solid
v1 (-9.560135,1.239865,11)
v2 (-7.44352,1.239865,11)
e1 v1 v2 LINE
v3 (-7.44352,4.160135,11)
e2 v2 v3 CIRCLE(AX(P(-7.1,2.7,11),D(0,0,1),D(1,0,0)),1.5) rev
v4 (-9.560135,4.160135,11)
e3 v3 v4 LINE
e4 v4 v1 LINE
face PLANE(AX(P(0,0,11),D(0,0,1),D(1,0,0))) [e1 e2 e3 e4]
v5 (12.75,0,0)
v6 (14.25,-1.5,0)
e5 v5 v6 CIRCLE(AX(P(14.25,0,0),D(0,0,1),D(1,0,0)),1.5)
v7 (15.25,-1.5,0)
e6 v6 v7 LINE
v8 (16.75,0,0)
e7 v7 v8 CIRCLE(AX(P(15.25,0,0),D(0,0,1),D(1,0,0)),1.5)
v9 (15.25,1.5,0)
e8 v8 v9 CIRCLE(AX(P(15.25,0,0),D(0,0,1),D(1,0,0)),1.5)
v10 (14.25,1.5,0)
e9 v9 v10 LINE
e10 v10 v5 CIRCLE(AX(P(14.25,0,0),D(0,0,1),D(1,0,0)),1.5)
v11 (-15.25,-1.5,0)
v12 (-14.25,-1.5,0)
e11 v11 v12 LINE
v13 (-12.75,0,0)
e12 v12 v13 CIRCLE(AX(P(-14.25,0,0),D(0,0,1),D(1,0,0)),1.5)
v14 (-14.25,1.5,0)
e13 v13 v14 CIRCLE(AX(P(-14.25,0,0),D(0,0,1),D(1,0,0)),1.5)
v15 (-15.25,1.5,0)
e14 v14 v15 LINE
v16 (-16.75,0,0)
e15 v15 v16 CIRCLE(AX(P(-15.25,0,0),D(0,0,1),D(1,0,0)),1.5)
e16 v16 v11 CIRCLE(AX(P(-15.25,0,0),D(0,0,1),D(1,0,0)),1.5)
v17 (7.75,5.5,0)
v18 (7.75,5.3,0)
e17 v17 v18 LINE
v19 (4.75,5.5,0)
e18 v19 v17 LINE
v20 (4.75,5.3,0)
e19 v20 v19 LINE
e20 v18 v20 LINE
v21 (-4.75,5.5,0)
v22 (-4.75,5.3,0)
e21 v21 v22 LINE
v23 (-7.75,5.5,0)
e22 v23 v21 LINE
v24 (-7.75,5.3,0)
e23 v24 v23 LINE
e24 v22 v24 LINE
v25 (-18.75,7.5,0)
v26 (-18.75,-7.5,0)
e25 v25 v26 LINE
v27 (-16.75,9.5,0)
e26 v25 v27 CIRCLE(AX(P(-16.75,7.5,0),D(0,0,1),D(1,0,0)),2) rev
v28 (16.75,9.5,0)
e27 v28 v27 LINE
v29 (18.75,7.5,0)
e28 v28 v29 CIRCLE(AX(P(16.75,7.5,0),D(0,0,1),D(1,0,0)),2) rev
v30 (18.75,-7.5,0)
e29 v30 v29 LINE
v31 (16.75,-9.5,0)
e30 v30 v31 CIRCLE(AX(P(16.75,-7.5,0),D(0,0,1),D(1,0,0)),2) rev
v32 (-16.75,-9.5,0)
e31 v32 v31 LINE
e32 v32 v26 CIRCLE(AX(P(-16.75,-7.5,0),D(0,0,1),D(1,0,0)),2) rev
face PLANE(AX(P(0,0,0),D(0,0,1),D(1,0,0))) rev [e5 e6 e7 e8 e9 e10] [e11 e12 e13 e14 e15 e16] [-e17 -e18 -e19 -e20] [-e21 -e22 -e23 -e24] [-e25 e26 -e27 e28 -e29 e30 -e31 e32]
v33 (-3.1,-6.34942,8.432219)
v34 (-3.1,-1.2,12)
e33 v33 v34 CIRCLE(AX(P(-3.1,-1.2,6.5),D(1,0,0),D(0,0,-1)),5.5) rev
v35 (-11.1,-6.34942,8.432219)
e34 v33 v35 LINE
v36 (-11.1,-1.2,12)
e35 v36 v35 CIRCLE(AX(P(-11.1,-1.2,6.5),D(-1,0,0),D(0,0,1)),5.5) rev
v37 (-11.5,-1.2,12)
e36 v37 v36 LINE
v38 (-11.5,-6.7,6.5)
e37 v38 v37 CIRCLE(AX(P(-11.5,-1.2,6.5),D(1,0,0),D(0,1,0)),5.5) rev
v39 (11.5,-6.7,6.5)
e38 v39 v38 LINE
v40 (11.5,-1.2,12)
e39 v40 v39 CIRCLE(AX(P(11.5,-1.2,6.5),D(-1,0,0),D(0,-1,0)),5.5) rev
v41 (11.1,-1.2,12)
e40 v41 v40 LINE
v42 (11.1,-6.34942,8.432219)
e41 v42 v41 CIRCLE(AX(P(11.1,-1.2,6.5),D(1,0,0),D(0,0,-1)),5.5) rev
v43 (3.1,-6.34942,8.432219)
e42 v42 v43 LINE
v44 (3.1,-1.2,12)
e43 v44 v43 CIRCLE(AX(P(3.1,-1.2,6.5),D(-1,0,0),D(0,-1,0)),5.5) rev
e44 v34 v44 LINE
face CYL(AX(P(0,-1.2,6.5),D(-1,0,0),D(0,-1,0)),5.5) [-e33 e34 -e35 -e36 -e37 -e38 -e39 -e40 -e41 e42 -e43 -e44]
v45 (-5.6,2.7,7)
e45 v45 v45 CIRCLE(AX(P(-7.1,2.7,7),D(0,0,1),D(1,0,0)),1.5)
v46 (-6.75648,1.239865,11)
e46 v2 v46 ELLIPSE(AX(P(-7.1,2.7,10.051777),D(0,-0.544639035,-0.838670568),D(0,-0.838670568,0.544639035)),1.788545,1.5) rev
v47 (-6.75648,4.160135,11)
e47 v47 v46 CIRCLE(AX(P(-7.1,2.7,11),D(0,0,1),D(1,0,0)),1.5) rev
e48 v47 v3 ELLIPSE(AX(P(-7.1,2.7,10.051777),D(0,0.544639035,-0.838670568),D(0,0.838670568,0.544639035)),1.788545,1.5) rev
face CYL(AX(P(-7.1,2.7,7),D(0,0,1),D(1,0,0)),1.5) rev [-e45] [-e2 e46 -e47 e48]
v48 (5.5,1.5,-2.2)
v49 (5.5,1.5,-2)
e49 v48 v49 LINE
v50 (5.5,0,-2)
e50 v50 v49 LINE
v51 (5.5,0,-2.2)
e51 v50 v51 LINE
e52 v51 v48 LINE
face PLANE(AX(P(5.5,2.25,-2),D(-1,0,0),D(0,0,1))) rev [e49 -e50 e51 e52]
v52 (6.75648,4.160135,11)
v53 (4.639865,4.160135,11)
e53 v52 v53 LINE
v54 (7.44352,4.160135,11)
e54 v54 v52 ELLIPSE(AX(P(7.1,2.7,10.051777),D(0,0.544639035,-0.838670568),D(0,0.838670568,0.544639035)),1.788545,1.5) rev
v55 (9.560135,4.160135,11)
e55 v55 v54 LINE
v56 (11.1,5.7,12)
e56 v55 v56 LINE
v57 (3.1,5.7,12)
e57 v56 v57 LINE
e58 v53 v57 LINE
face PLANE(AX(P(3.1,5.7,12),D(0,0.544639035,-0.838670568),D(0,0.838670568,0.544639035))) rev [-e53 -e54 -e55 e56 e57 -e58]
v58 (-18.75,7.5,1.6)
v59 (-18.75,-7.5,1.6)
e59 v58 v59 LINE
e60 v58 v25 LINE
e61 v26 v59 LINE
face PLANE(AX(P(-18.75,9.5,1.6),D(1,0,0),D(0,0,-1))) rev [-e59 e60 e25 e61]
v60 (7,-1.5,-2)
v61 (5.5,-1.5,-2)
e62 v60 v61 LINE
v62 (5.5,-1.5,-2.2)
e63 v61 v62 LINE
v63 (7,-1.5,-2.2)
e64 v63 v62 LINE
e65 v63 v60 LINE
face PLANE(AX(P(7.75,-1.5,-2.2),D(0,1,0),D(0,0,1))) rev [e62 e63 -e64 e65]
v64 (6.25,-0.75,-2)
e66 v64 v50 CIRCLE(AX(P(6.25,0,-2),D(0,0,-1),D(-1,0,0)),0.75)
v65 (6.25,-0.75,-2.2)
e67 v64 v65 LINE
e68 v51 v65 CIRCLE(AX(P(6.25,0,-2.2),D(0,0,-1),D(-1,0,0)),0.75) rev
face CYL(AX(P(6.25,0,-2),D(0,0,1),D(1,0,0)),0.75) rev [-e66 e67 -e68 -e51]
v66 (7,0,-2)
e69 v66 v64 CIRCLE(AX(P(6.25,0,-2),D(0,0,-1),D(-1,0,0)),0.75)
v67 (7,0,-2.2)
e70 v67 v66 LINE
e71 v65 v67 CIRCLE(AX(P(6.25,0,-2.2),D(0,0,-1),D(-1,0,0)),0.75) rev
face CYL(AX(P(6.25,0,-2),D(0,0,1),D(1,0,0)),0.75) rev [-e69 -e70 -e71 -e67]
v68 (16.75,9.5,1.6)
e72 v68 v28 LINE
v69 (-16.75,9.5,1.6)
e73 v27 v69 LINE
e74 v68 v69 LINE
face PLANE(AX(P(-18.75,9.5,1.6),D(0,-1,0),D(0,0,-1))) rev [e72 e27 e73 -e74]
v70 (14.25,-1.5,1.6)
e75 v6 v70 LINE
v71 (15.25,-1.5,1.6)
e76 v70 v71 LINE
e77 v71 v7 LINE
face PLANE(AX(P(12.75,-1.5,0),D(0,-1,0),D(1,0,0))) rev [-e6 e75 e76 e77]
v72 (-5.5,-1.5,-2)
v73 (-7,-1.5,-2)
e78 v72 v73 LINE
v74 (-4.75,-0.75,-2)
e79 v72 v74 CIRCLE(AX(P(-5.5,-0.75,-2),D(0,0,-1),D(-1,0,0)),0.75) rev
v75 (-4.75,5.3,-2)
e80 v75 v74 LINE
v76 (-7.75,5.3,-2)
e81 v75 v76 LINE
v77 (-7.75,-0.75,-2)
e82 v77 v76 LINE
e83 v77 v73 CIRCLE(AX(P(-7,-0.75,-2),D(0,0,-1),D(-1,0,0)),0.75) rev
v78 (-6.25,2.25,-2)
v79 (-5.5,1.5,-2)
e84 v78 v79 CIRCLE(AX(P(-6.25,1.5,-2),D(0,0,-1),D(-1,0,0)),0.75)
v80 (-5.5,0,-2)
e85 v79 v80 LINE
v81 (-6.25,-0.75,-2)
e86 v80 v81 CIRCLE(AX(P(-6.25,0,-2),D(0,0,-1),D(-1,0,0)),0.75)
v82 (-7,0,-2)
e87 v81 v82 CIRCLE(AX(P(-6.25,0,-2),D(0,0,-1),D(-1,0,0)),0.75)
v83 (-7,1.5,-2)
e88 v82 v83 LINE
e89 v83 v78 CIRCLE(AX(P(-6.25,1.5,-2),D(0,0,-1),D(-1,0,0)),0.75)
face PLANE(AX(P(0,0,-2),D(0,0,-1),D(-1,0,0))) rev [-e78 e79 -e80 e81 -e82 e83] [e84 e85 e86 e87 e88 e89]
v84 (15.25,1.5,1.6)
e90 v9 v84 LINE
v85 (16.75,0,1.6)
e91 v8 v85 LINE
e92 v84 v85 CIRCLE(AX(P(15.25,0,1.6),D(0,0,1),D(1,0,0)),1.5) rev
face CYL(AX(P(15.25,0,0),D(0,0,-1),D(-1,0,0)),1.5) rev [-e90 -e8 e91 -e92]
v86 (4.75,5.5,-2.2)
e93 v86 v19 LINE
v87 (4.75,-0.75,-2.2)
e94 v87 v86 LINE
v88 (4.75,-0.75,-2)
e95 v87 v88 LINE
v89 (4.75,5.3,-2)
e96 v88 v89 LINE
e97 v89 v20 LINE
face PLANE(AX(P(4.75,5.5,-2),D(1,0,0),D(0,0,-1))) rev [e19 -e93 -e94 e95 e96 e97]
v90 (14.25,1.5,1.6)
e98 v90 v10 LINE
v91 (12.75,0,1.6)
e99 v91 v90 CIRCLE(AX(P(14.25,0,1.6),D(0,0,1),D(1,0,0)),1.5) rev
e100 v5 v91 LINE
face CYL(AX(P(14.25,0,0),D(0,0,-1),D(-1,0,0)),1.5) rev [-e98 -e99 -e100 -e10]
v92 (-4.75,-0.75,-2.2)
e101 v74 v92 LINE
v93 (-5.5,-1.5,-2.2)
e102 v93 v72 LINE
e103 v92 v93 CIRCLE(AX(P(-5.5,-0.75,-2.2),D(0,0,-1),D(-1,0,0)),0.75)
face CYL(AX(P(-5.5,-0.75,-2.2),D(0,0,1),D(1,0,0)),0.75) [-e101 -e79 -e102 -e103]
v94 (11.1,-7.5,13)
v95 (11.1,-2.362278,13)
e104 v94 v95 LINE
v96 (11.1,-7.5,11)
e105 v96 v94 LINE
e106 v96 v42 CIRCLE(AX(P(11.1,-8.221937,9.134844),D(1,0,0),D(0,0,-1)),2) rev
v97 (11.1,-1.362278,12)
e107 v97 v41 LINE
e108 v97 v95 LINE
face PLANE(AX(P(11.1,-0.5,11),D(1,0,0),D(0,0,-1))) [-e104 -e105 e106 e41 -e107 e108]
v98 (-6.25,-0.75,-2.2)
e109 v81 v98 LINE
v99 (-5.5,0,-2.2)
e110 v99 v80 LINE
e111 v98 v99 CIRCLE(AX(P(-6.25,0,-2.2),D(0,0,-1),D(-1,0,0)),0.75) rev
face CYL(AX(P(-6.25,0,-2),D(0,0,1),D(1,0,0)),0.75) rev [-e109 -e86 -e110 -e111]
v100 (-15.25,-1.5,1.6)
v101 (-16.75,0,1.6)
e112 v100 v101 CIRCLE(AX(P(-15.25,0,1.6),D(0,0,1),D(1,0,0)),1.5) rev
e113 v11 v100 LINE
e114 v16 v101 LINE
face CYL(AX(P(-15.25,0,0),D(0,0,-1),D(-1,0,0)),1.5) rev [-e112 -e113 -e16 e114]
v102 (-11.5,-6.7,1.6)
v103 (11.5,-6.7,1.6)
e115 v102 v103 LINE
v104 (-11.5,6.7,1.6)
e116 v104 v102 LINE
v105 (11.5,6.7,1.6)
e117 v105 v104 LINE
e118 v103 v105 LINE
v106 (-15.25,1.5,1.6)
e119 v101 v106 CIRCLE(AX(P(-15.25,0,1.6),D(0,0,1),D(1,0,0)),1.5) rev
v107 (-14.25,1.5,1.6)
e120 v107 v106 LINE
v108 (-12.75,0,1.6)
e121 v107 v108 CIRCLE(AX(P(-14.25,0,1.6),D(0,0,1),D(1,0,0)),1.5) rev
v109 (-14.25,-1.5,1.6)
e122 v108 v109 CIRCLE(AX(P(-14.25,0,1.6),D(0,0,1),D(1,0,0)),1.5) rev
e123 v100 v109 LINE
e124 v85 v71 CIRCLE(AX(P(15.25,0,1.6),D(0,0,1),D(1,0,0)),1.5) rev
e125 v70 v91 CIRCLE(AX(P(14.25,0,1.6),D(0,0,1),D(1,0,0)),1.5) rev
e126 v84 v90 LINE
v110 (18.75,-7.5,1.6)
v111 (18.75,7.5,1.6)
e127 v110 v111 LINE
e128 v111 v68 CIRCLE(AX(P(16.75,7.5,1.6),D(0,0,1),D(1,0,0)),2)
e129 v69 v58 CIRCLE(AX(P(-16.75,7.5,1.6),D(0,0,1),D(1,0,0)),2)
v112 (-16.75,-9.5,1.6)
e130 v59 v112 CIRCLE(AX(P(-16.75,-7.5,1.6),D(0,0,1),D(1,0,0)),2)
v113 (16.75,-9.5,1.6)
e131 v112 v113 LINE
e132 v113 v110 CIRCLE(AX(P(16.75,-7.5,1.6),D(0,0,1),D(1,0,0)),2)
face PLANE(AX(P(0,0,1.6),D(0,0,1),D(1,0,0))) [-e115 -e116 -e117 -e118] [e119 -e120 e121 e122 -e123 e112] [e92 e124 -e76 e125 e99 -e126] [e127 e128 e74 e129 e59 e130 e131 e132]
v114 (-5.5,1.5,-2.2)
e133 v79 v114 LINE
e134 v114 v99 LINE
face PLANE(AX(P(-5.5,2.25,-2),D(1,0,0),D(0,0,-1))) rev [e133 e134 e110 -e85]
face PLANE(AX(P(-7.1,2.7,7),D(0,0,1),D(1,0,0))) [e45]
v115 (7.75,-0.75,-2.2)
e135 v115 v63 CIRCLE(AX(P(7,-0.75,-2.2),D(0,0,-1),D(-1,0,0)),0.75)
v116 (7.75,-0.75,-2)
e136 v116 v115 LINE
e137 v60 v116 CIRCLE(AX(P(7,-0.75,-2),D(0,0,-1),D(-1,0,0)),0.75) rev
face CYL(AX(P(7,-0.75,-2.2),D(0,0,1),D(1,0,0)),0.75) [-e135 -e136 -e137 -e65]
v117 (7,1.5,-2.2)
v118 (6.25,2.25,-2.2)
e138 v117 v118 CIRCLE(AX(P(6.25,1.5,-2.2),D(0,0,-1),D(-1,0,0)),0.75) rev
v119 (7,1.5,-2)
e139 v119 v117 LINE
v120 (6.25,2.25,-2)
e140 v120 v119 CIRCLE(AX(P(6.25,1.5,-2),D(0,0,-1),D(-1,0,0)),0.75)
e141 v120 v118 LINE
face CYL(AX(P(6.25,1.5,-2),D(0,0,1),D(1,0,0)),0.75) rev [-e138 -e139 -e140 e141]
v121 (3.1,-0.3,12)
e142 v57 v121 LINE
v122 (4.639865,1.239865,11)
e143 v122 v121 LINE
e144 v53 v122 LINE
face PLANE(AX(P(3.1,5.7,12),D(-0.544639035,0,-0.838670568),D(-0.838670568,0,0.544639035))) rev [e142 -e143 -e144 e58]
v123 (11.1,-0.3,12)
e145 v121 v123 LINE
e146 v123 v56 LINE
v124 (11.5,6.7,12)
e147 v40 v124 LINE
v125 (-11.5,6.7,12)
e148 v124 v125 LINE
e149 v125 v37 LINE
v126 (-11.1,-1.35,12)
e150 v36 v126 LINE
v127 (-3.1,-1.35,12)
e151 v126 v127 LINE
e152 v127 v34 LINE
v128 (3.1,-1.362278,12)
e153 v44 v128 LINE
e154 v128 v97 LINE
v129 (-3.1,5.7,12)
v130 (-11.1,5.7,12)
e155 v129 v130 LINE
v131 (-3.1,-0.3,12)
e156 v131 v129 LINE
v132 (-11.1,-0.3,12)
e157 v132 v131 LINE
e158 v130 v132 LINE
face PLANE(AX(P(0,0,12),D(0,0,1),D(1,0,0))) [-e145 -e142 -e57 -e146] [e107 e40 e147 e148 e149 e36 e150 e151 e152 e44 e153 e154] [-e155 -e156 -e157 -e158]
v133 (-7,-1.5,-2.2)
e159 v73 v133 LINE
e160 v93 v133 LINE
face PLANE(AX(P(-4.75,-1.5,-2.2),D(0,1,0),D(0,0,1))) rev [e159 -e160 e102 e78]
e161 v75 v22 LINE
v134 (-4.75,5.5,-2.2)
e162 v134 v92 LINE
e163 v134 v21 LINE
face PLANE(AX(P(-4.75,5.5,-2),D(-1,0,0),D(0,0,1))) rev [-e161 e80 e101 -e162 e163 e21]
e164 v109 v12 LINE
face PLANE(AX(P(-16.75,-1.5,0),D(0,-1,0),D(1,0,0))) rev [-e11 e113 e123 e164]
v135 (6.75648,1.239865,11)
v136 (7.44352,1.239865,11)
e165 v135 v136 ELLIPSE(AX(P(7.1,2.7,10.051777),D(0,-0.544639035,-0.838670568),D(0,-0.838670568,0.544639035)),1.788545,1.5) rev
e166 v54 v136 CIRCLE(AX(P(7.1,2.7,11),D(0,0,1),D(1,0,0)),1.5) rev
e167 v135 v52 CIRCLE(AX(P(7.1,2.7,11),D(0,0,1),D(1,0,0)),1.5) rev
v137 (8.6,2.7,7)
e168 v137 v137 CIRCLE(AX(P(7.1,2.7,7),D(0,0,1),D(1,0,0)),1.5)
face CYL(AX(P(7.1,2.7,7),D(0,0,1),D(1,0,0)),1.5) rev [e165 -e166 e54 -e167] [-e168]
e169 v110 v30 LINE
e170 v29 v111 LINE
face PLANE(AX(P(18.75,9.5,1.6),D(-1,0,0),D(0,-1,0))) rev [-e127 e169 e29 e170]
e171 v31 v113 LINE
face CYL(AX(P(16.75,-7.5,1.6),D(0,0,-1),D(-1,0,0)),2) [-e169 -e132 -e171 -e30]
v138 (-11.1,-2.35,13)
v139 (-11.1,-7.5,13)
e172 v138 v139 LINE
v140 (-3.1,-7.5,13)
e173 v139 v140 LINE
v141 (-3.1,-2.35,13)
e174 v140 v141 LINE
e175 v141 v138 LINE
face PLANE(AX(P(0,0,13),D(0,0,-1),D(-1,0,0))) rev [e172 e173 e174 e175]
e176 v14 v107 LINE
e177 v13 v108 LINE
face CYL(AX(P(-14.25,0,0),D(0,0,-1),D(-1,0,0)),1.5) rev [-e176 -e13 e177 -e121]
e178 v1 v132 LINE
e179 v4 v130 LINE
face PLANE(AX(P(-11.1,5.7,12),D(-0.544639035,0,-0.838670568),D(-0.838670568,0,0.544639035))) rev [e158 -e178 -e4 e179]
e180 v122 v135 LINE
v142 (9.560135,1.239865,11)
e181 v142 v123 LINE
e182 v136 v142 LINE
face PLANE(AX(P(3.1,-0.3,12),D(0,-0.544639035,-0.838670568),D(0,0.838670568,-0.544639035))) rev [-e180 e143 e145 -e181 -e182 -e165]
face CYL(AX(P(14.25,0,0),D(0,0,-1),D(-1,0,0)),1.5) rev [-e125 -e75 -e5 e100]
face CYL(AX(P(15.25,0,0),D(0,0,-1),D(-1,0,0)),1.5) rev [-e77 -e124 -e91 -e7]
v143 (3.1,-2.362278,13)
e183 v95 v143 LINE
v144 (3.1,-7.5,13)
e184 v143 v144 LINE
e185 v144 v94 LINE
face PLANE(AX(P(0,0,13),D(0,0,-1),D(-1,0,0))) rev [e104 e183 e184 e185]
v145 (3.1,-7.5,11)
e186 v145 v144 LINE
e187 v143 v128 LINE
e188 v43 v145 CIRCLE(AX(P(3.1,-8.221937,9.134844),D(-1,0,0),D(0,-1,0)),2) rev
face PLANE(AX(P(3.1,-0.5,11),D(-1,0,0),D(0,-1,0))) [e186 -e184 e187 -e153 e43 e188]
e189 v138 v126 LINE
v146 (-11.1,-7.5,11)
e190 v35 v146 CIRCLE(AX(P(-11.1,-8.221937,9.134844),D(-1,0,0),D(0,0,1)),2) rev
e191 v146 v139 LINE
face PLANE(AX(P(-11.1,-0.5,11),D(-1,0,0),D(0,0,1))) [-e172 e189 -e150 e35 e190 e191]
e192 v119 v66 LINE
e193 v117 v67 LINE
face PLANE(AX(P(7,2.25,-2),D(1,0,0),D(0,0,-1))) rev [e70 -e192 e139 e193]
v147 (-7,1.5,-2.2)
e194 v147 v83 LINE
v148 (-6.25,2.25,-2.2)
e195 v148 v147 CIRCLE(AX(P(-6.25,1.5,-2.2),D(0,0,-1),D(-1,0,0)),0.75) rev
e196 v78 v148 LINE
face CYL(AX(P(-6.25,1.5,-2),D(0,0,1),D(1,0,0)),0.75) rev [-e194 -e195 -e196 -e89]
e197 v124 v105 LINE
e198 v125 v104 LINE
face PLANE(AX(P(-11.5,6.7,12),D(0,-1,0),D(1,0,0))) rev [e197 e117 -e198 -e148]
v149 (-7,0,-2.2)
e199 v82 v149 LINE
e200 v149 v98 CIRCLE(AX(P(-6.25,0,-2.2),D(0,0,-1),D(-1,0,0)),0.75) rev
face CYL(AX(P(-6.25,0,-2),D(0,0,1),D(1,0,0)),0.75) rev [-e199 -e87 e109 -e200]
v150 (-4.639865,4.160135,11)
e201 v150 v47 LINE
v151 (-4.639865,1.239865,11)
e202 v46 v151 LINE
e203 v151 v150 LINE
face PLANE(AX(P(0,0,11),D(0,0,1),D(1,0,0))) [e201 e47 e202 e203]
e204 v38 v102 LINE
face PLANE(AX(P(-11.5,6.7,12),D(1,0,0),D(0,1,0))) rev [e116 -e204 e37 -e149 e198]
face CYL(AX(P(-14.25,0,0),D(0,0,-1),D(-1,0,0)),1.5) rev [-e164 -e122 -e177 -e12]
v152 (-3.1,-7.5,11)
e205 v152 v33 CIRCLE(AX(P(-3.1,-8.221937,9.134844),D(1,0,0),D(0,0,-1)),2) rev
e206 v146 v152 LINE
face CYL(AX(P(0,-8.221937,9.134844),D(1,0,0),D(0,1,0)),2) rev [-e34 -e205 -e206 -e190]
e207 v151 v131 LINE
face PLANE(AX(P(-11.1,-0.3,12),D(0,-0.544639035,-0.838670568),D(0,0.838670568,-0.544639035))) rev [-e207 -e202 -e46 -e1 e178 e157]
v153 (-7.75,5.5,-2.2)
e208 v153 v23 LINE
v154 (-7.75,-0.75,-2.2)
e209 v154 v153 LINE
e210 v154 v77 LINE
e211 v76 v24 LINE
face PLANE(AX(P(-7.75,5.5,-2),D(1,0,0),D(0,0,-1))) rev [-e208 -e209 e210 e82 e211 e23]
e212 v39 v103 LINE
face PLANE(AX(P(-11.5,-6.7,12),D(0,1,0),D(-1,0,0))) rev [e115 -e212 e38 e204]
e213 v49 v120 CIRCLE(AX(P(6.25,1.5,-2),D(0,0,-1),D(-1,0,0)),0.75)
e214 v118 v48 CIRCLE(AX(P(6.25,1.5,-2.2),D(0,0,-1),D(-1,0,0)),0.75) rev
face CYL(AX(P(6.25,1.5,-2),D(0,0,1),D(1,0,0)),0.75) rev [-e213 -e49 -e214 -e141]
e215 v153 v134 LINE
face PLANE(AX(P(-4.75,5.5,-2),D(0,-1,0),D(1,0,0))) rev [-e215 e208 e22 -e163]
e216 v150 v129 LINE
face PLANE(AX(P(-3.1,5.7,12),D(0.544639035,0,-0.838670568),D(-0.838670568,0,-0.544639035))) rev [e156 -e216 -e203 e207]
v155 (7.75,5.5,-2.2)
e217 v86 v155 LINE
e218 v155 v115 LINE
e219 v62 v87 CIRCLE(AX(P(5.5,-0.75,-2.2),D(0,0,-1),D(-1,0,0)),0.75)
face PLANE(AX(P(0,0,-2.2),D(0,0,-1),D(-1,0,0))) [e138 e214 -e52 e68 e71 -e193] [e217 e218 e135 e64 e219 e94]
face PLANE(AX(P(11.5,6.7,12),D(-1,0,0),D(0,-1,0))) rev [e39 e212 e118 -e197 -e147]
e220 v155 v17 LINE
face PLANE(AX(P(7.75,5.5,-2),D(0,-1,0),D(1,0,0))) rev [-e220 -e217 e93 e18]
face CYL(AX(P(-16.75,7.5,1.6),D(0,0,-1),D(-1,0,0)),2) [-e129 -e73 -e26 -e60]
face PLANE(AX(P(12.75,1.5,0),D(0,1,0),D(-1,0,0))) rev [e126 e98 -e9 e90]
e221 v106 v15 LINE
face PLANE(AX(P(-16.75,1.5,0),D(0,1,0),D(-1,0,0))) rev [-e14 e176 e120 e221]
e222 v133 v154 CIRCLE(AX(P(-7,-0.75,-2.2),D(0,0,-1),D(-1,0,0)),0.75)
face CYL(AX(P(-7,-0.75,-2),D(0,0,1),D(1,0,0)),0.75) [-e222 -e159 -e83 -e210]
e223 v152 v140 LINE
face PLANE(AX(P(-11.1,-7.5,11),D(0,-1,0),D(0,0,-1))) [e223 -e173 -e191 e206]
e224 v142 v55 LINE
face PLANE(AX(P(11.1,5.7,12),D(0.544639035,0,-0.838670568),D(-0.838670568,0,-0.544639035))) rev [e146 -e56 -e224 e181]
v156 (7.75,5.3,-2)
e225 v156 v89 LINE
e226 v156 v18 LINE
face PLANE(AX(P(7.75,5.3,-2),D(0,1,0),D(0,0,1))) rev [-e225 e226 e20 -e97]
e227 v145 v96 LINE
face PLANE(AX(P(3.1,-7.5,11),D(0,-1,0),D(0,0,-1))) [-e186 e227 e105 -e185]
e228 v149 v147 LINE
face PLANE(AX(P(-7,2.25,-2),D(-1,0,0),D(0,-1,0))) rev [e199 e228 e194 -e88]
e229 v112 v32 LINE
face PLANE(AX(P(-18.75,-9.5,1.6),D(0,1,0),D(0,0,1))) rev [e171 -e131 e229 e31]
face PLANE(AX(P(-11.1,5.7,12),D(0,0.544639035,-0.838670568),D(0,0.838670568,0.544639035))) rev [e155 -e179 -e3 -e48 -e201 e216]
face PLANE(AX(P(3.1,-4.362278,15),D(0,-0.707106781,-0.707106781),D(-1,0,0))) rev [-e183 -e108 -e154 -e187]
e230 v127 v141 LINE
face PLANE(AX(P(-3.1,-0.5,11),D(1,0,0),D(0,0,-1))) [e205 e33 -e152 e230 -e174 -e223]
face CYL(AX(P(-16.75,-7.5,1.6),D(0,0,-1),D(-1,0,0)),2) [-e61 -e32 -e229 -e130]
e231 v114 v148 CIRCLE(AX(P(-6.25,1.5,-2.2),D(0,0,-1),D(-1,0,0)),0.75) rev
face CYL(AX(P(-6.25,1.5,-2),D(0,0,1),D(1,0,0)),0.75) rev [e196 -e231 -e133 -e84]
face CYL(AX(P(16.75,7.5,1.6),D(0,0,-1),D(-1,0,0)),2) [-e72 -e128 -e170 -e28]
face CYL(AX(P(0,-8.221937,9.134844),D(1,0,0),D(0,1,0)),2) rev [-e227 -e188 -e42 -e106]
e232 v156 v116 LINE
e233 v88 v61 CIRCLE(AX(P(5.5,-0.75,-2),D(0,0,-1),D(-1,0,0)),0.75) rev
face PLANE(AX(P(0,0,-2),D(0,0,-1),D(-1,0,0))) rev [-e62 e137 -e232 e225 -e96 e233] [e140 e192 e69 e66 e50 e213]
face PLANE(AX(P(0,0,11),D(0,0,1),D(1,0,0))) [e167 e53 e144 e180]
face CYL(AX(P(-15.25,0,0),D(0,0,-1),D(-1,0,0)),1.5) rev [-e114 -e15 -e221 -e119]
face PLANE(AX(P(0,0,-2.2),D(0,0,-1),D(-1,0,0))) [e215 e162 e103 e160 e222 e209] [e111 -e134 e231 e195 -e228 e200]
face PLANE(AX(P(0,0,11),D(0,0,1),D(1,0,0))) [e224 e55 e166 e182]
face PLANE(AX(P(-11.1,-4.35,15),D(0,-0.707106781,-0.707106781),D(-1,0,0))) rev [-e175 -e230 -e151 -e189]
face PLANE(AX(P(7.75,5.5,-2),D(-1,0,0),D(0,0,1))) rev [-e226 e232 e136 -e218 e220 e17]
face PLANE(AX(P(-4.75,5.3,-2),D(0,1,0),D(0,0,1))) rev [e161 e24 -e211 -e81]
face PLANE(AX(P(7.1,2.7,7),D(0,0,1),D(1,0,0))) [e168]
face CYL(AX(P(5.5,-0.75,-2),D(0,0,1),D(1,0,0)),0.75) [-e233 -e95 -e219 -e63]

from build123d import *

# Parameters (mm, degrees)
SKETCH_2_W                    = 37.5
SKETCH_2_H                    = 19
EXTRUDE_1_DEPTH               = 1.6
SKETCH_3_W                    = 23
SKETCH_3_H                    = 13.4
EXTRUDE_2_DEPTH               = 10.4
FILLET_1_R                    = 2
SKETCH_4_W                    = 4
SKETCH_4_H                    = 3
CUT_EXTRUDE_1_DEPTH           = 1.6
FILLET_2_R                    = 1.5
SKETCH_5_R                    = 1.5
CUT_EXTRUDE_2_DEPTH           = 5
SKETCH_6_W                    = 8
SKETCH_6_H                    = 6
CUT_EXTRUDE_3_DEPTH           = 1
CUT_EXTRUDE_3_DRAFT           = -57
CUT_EXTRUDE_3_PROFILE_2_DEPTH = 1
CUT_EXTRUDE_3_PROFILE_2_DRAFT = -57
FILLET_3_R                    = 5.5
SKETCH_7_W                    = 8
SKETCH_7_H                    = 7
EXTRUDE_3_DEPTH               = 1
SKETCH_8_W                    = 8
SKETCH_8_H                    = 3.15
SKETCH_8_H_2                  = 3.13772234
EXTRUDE_4_DEPTH               = 1
FILLET_4_R                    = 2
SKETCH_9_W                    = 3
SKETCH_9_H                    = 0.2
EXTRUDE_5_DEPTH               = 2
SKETCH_10_W                   = 3
SKETCH_10_H                   = 7
EXTRUDE_6_DEPTH               = 0.2
SKETCH_11_W                   = 1.5
SKETCH_11_H                   = 3
CUT_EXTRUDE_4_DEPTH           = 0.2
FILLET_5_R                    = 0.75


# Some blends are built 0.0001 mm under size
with BuildPart() as part:
    # Эскиз2 → Бобышка-Вытянуть1 (new body)
    with BuildSketch(Plane.XY):
        Rectangle(SKETCH_2_W, SKETCH_2_H)
    extrude(amount=EXTRUDE_1_DEPTH)

    # Эскиз3 → Бобышка-Вытянуть2 (add)
    with BuildSketch(Plane.XY.offset(1.6)):
        Rectangle(SKETCH_3_W, SKETCH_3_H)
    extrude(amount=EXTRUDE_2_DEPTH)

    # Скругление1
    fillet_1_edges = [part.edges().sort_by_distance(p)[0] for p in [
        (-18.75, 9.5, 0.8),
        (18.75, 9.5, 0.8),
        (18.75, -9.5, 0.8),
        (-18.75, -9.5, 0.8),
    ]]
    fillet(fillet_1_edges, radius=FILLET_1_R)

    # Эскиз4 → Вырез-Вытянуть1 (cut)
    with BuildSketch(Plane.XY.offset(1.6)):
        with Locations((14.75, 0)):
            Rectangle(SKETCH_4_W, SKETCH_4_H)
        with Locations((-14.75, 0)):
            Rectangle(SKETCH_4_W, SKETCH_4_H)
    extrude(amount=-CUT_EXTRUDE_1_DEPTH, mode=Mode.SUBTRACT)

    # Скругление2
    fillet_2_edges = [part.edges().sort_by_distance(p)[0] for p in [
        (-16.75, 1.5, 0.8),
        (-12.75, 1.5, 0.8),
        (16.75, 1.5, 0.8),
        (16.75, -1.5, 0.8),
        (-12.75, -1.5, 0.8),
        (-16.75, -1.5, 0.8),
        (12.75, -1.5, 0.8),
        (12.75, 1.5, 0.8),
    ]]
    fillet(fillet_2_edges, radius=FILLET_2_R - 0.0001)  # a hair under: the kernel refuses the full size

    # Эскиз5 → Вырез-Вытянуть2 (cut)
    with BuildSketch(Plane.XY.offset(12)):
        with Locations((-7.1, 2.7)):
            Circle(SKETCH_5_R)
        with Locations((7.1, 2.7)):
            Circle(SKETCH_5_R)
    extrude(amount=-CUT_EXTRUDE_2_DEPTH, mode=Mode.SUBTRACT)


with BuildPart() as cut_extrude_3_tool:
    # Эскиз6 → Вырез-Вытянуть3 (with draft: the straight prism first)
    with BuildSketch(Plane.XY.offset(12)):
        with Locations((-7.1, 2.7)):
            Rectangle(SKETCH_6_W, SKETCH_6_H)
    extrude(amount=-CUT_EXTRUDE_3_DEPTH)
    # Вырез-Вытянуть3: the draft: its side faces are tilted about the plane it starts from
    cut_extrude_3_sides = [cut_extrude_3_tool.faces().sort_by_distance(p)[0] for p in [
        (-11.1, 2.7, 11.5),
        (-7.1, -0.3, 11.5),
        (-3.1, 2.7, 11.5),
        (-7.1, 5.7, 11.5),
    ]]
    draft(cut_extrude_3_sides, Plane.XY.offset(12), CUT_EXTRUDE_3_DRAFT)


with BuildPart() as part_1:
    add(part.part)

    # Вырез-Вытянуть3: cut by cut_extrude_3_tool
    add(cut_extrude_3_tool.part, mode=Mode.SUBTRACT)


with BuildPart() as cut_extrude_3_profile_2_tool:
    # Эскиз6 → Вырез-Вытянуть3 profile 2 (with draft: the straight prism first)
    with BuildSketch(Plane.XY.offset(12)):
        with Locations((7.1, 2.7)):
            Rectangle(SKETCH_6_W, SKETCH_6_H)
    extrude(amount=-CUT_EXTRUDE_3_PROFILE_2_DEPTH)
    # Вырез-Вытянуть3 profile 2: the draft: its side faces are tilted about the plane it starts from
    cut_extrude_3_profile_2_sides = [cut_extrude_3_profile_2_tool.faces().sort_by_distance(p)[0] for p in [
        (3.1, 2.7, 11.5),
        (7.1, -0.3, 11.5),
        (11.1, 2.7, 11.5),
        (7.1, 5.7, 11.5),
    ]]
    draft(cut_extrude_3_profile_2_sides, Plane.XY.offset(12), CUT_EXTRUDE_3_PROFILE_2_DRAFT)


with BuildPart() as part_2:
    add(part_1.part)

    # Вырез-Вытянуть3 profile 2: cut by cut_extrude_3_profile_2_tool
    add(cut_extrude_3_profile_2_tool.part, mode=Mode.SUBTRACT)

    # Скругление3
    fillet_3_edges = [part_2.edges().sort_by_distance(p)[0] for p in [
        (0, -6.7, 12),
    ]]
    fillet(fillet_3_edges, radius=FILLET_3_R)

    # Эскиз7 → Бобышка-Вытянуть3 (add)
    with BuildSketch(Plane.XY.offset(12)):
        with Locations((-7.1, -4)):
            Rectangle(SKETCH_7_W, SKETCH_7_H)
        with Locations((7.1, -4)):
            Rectangle(SKETCH_7_W, SKETCH_7_H)
    extrude(amount=-EXTRUDE_3_DEPTH)

    # Эскиз8 → Бобышка-Вытянуть4 (add)
    with BuildSketch(Plane.XY.offset(12)):
        with Locations((-7.1, -5.925)):
            Rectangle(SKETCH_8_W, SKETCH_8_H)
        with Locations((7.1, -5.93113883)):
            Rectangle(SKETCH_8_W, SKETCH_8_H_2)
    extrude(amount=EXTRUDE_4_DEPTH)

    # Фаска1
    # the kernel refuses this chamfer: 3 mm, written as the material it adds along each edge
    with BuildSketch(Plane(origin=(-3.1, -4.35, 12), x_dir=(0, 0.9996219169112968, -0.027495876610586202), z_dir=(-1, 0, 0))) as chamfer_1_piece_1_section:
        with BuildLine():
            Line((3.086019586, 0), (-0.169641465, -3.081353381))
            Line((-0.169641465, -3.081353381), (-0.22961878, -3.079703628))
            ThreePointArc((-0.22961878, -3.079703628), (-0.102387681, -1.540193489), (-0.059977315, 0.001649753))
            Line((-0.059977315, 0.001649753), (0.001649753, 0.059977315))
            ThreePointArc((0.001649753, 0.059977315), (1.543492994, 0.017566949), (3.087669338, 0.059977315))
            Line((3.087669338, 0.059977315), (3.086019586, 0))
        make_face()
    chamfer_1_piece_1 = extrude(amount=8, mode=Mode.PRIVATE)
    chamfer_1_piece_1 = split(chamfer_1_piece_1, bisect_by=Plane(origin=(-7.1, -3.063879333, 13), z_dir=(0, 0, -1)), keep=Keep.TOP, mode=Mode.PRIVATE)
    add(chamfer_1_piece_1)
    with BuildSketch(Plane(origin=(11.1, -4.36227766, 12), x_dir=(0, 0.9996219169112968, -0.027495876610586202), z_dir=(-1, 0, 0))) as chamfer_1_piece_2_section:
        with BuildLine():
            Line((3.086019586, 0), (-0.169641465, -3.081353381))
            Line((-0.169641465, -3.081353381), (-0.22961878, -3.079703628))
            ThreePointArc((-0.22961878, -3.079703628), (-0.102387681, -1.540193489), (-0.059977315, 0.001649753))
            Line((-0.059977315, 0.001649753), (0.001649753, 0.059977315))
            ThreePointArc((0.001649753, 0.059977315), (1.543492994, 0.017566949), (3.087669338, 0.059977315))
            Line((3.087669338, 0.059977315), (3.086019586, 0))
        make_face()
    chamfer_1_piece_2 = extrude(amount=8, mode=Mode.PRIVATE)
    chamfer_1_piece_2 = split(chamfer_1_piece_2, bisect_by=Plane(origin=(7.1, -3.076156993, 13), z_dir=(0, 0, -1)), keep=Keep.TOP, mode=Mode.PRIVATE)
    add(chamfer_1_piece_2)

    # Скругление4
    # the kernel refuses this fillet: 2 mm, written as the material it adds along each edge
    with BuildSketch(Plane(origin=(5.017202419, -4.36227766, 11), x_dir=(0, -0.6120158801433927, -0.7908454731819031), z_dir=(-1, 0, 0))) as fillet_4_piece_1_section:
        with BuildLine():
            CenterArc((3.837222962, 1.910888885), FILLET_4_R, 163.424275541, 89.407933075)
            Line((1.920335899, 2.481453509), (1.881998158, 2.492864801))
            ThreePointArc((1.881998158, 2.492864801), (0.928534131, 1.265207389), (-0.031633819, 0.024480635))
            Line((-0.031633819, 0.024480635), (0.01180684, -0.038217778))
            ThreePointArc((0.01180684, -0.038217778), (1.623440484, 0.205055567), (3.235074128, -0.038217778))
            Line((3.235074128, -0.038217778), (3.246880968, 0))
        make_face()
    fillet_4_piece_1 = extrude(amount=16.117202419, mode=Mode.PRIVATE)
    fillet_4_piece_1 = split(fillet_4_piece_1, bisect_by=Plane(origin=(3.1, -5.888894845, 10.384505844), z_dir=(1, 0, 0)), keep=Keep.TOP, mode=Mode.PRIVATE)
    add(fillet_4_piece_1)
    with BuildSketch(Plane(origin=(-3.1, -4.36227766, 11), x_dir=(0, -0.6120158801433927, -0.7908454731819031), z_dir=(-1, 0, 0))) as fillet_4_piece_2:
        with BuildLine():
            CenterArc((3.837222962, 1.910888885), FILLET_4_R, 163.424275541, 89.407933075)
            Line((1.920335899, 2.481453509), (1.881998158, 2.492864801))
            ThreePointArc((1.881998158, 2.492864801), (0.928534131, 1.265207389), (-0.031633819, 0.024480635))
            Line((-0.031633819, 0.024480635), (0.01180684, -0.038217778))
            ThreePointArc((0.01180684, -0.038217778), (1.623440484, 0.205055567), (3.235074128, -0.038217778))
            Line((3.235074128, -0.038217778), (3.246880968, 0))
        make_face()
    extrude(amount=8)
    with BuildSketch(Plane(origin=(11.1, -4.36227766, 11), x_dir=(0, -1, 0), z_dir=(-1, 0, 0))) as fillet_4_piece_3:
        with BuildLine():
            CenterArc((3.859659213, -1.865156066), FILLET_4_R, 111.159682929, 89.407933075)
            Line((1.987142713, -2.567781115), (1.949692383, -2.581833616))
            ThreePointArc((1.949692383, -2.581833616), (1.155738623, -1.158393294), (-0.022998383, -0.032727273))
            Line((-0.022998383, -0.032727273), (0, 0.04))
            ThreePointArc((0, 0.04), (1.56886117, 0.04), (3.123283602, 0.037303121))
            Line((3.123283602, 0.037303121), (3.13772234, 0))
        make_face()
    extrude(amount=8)
    with BuildSketch(Plane(origin=(11.1, -4.36227766, 11), x_dir=(0, -1, 0), z_dir=(-1, 0, 0))) as fillet_4_piece_4_section:
        with BuildLine():
            CenterArc((3.859659213, -1.865156066), FILLET_4_R, 111.159682929, 89.407933075)
            Line((1.987142713, -2.567781115), (1.949692383, -2.581833616))
            ThreePointArc((1.949692383, -2.581833616), (1.155738623, -1.158393294), (-0.022998383, -0.032727273))
            Line((-0.022998383, -0.032727273), (0, 0.04))
            ThreePointArc((0, 0.04), (1.56886117, 0.04), (3.123283602, 0.037303121))
            Line((3.123283602, 0.037303121), (3.13772234, 0))
        make_face()
    fillet_4_piece_4 = extrude(amount=16.117202419, mode=Mode.PRIVATE)
    fillet_4_piece_4 = split(fillet_4_piece_4, bisect_by=Plane(origin=(-3.1, -5.888894845, 10.384505844), z_dir=(-1, 0, 0)), keep=Keep.TOP, mode=Mode.PRIVATE)
    add(fillet_4_piece_4)

    # Эскиз9 → Бобышка-Вытянуть5 (add)
    with BuildSketch(Plane(origin=(0, 0, 0), x_dir=(-1, 0, 0), z_dir=(0, 0, -1))):
        with Locations((-6.25, 5.4)):
            Rectangle(SKETCH_9_W, SKETCH_9_H)
        with Locations((6.25, 5.4)):
            Rectangle(SKETCH_9_W, SKETCH_9_H)
    extrude(amount=EXTRUDE_5_DEPTH)

    # Эскиз10 → Бобышка-Вытянуть6 (add)
    with BuildSketch(Plane(origin=(0, 0, -2), x_dir=(-1, 0, 0), z_dir=(0, 0, -1))):
        with Locations((-6.25, 2)):
            Rectangle(SKETCH_10_W, SKETCH_10_H)
        with Locations((6.25, 2)):
            Rectangle(SKETCH_10_W, SKETCH_10_H)
    extrude(amount=EXTRUDE_6_DEPTH)

    # Эскиз11 → Вырез-Вытянуть4 (cut)
    with BuildSketch(Plane(origin=(0, 0, -2.2), x_dir=(-1, 0, 0), z_dir=(0, 0, -1))):
        with Locations((-6.25, 0.75)):
            Rectangle(SKETCH_11_W, SKETCH_11_H)
        with Locations((6.25, 0.75)):
            Rectangle(SKETCH_11_W, SKETCH_11_H)
    extrude(amount=-CUT_EXTRUDE_4_DEPTH, mode=Mode.SUBTRACT)

    # Скругление5
    fillet_5_edges = [part_2.edges().sort_by_distance(p)[0] for p in [
        (-7, 2.25, -2.1),
        (-7, -0.75, -2.1),
        (5.5, -0.75, -2.1),
        (7, -0.75, -2.1),
        (-5.5, -0.75, -2.1),
        (-5.5, 2.25, -2.1),
        (4.75, -1.5, -2.1),
        (7, 2.25, -2.1),
        (7.75, -1.5, -2.1),
        (5.5, 2.25, -2.1),
        (-7.75, -1.5, -2.1),
        (-4.75, -1.5, -2.1),
    ]]
    fillet(fillet_5_edges, radius=FILLET_5_R - 0.0001)  # a hair under: the kernel refuses the full size


solid = part_2.part
